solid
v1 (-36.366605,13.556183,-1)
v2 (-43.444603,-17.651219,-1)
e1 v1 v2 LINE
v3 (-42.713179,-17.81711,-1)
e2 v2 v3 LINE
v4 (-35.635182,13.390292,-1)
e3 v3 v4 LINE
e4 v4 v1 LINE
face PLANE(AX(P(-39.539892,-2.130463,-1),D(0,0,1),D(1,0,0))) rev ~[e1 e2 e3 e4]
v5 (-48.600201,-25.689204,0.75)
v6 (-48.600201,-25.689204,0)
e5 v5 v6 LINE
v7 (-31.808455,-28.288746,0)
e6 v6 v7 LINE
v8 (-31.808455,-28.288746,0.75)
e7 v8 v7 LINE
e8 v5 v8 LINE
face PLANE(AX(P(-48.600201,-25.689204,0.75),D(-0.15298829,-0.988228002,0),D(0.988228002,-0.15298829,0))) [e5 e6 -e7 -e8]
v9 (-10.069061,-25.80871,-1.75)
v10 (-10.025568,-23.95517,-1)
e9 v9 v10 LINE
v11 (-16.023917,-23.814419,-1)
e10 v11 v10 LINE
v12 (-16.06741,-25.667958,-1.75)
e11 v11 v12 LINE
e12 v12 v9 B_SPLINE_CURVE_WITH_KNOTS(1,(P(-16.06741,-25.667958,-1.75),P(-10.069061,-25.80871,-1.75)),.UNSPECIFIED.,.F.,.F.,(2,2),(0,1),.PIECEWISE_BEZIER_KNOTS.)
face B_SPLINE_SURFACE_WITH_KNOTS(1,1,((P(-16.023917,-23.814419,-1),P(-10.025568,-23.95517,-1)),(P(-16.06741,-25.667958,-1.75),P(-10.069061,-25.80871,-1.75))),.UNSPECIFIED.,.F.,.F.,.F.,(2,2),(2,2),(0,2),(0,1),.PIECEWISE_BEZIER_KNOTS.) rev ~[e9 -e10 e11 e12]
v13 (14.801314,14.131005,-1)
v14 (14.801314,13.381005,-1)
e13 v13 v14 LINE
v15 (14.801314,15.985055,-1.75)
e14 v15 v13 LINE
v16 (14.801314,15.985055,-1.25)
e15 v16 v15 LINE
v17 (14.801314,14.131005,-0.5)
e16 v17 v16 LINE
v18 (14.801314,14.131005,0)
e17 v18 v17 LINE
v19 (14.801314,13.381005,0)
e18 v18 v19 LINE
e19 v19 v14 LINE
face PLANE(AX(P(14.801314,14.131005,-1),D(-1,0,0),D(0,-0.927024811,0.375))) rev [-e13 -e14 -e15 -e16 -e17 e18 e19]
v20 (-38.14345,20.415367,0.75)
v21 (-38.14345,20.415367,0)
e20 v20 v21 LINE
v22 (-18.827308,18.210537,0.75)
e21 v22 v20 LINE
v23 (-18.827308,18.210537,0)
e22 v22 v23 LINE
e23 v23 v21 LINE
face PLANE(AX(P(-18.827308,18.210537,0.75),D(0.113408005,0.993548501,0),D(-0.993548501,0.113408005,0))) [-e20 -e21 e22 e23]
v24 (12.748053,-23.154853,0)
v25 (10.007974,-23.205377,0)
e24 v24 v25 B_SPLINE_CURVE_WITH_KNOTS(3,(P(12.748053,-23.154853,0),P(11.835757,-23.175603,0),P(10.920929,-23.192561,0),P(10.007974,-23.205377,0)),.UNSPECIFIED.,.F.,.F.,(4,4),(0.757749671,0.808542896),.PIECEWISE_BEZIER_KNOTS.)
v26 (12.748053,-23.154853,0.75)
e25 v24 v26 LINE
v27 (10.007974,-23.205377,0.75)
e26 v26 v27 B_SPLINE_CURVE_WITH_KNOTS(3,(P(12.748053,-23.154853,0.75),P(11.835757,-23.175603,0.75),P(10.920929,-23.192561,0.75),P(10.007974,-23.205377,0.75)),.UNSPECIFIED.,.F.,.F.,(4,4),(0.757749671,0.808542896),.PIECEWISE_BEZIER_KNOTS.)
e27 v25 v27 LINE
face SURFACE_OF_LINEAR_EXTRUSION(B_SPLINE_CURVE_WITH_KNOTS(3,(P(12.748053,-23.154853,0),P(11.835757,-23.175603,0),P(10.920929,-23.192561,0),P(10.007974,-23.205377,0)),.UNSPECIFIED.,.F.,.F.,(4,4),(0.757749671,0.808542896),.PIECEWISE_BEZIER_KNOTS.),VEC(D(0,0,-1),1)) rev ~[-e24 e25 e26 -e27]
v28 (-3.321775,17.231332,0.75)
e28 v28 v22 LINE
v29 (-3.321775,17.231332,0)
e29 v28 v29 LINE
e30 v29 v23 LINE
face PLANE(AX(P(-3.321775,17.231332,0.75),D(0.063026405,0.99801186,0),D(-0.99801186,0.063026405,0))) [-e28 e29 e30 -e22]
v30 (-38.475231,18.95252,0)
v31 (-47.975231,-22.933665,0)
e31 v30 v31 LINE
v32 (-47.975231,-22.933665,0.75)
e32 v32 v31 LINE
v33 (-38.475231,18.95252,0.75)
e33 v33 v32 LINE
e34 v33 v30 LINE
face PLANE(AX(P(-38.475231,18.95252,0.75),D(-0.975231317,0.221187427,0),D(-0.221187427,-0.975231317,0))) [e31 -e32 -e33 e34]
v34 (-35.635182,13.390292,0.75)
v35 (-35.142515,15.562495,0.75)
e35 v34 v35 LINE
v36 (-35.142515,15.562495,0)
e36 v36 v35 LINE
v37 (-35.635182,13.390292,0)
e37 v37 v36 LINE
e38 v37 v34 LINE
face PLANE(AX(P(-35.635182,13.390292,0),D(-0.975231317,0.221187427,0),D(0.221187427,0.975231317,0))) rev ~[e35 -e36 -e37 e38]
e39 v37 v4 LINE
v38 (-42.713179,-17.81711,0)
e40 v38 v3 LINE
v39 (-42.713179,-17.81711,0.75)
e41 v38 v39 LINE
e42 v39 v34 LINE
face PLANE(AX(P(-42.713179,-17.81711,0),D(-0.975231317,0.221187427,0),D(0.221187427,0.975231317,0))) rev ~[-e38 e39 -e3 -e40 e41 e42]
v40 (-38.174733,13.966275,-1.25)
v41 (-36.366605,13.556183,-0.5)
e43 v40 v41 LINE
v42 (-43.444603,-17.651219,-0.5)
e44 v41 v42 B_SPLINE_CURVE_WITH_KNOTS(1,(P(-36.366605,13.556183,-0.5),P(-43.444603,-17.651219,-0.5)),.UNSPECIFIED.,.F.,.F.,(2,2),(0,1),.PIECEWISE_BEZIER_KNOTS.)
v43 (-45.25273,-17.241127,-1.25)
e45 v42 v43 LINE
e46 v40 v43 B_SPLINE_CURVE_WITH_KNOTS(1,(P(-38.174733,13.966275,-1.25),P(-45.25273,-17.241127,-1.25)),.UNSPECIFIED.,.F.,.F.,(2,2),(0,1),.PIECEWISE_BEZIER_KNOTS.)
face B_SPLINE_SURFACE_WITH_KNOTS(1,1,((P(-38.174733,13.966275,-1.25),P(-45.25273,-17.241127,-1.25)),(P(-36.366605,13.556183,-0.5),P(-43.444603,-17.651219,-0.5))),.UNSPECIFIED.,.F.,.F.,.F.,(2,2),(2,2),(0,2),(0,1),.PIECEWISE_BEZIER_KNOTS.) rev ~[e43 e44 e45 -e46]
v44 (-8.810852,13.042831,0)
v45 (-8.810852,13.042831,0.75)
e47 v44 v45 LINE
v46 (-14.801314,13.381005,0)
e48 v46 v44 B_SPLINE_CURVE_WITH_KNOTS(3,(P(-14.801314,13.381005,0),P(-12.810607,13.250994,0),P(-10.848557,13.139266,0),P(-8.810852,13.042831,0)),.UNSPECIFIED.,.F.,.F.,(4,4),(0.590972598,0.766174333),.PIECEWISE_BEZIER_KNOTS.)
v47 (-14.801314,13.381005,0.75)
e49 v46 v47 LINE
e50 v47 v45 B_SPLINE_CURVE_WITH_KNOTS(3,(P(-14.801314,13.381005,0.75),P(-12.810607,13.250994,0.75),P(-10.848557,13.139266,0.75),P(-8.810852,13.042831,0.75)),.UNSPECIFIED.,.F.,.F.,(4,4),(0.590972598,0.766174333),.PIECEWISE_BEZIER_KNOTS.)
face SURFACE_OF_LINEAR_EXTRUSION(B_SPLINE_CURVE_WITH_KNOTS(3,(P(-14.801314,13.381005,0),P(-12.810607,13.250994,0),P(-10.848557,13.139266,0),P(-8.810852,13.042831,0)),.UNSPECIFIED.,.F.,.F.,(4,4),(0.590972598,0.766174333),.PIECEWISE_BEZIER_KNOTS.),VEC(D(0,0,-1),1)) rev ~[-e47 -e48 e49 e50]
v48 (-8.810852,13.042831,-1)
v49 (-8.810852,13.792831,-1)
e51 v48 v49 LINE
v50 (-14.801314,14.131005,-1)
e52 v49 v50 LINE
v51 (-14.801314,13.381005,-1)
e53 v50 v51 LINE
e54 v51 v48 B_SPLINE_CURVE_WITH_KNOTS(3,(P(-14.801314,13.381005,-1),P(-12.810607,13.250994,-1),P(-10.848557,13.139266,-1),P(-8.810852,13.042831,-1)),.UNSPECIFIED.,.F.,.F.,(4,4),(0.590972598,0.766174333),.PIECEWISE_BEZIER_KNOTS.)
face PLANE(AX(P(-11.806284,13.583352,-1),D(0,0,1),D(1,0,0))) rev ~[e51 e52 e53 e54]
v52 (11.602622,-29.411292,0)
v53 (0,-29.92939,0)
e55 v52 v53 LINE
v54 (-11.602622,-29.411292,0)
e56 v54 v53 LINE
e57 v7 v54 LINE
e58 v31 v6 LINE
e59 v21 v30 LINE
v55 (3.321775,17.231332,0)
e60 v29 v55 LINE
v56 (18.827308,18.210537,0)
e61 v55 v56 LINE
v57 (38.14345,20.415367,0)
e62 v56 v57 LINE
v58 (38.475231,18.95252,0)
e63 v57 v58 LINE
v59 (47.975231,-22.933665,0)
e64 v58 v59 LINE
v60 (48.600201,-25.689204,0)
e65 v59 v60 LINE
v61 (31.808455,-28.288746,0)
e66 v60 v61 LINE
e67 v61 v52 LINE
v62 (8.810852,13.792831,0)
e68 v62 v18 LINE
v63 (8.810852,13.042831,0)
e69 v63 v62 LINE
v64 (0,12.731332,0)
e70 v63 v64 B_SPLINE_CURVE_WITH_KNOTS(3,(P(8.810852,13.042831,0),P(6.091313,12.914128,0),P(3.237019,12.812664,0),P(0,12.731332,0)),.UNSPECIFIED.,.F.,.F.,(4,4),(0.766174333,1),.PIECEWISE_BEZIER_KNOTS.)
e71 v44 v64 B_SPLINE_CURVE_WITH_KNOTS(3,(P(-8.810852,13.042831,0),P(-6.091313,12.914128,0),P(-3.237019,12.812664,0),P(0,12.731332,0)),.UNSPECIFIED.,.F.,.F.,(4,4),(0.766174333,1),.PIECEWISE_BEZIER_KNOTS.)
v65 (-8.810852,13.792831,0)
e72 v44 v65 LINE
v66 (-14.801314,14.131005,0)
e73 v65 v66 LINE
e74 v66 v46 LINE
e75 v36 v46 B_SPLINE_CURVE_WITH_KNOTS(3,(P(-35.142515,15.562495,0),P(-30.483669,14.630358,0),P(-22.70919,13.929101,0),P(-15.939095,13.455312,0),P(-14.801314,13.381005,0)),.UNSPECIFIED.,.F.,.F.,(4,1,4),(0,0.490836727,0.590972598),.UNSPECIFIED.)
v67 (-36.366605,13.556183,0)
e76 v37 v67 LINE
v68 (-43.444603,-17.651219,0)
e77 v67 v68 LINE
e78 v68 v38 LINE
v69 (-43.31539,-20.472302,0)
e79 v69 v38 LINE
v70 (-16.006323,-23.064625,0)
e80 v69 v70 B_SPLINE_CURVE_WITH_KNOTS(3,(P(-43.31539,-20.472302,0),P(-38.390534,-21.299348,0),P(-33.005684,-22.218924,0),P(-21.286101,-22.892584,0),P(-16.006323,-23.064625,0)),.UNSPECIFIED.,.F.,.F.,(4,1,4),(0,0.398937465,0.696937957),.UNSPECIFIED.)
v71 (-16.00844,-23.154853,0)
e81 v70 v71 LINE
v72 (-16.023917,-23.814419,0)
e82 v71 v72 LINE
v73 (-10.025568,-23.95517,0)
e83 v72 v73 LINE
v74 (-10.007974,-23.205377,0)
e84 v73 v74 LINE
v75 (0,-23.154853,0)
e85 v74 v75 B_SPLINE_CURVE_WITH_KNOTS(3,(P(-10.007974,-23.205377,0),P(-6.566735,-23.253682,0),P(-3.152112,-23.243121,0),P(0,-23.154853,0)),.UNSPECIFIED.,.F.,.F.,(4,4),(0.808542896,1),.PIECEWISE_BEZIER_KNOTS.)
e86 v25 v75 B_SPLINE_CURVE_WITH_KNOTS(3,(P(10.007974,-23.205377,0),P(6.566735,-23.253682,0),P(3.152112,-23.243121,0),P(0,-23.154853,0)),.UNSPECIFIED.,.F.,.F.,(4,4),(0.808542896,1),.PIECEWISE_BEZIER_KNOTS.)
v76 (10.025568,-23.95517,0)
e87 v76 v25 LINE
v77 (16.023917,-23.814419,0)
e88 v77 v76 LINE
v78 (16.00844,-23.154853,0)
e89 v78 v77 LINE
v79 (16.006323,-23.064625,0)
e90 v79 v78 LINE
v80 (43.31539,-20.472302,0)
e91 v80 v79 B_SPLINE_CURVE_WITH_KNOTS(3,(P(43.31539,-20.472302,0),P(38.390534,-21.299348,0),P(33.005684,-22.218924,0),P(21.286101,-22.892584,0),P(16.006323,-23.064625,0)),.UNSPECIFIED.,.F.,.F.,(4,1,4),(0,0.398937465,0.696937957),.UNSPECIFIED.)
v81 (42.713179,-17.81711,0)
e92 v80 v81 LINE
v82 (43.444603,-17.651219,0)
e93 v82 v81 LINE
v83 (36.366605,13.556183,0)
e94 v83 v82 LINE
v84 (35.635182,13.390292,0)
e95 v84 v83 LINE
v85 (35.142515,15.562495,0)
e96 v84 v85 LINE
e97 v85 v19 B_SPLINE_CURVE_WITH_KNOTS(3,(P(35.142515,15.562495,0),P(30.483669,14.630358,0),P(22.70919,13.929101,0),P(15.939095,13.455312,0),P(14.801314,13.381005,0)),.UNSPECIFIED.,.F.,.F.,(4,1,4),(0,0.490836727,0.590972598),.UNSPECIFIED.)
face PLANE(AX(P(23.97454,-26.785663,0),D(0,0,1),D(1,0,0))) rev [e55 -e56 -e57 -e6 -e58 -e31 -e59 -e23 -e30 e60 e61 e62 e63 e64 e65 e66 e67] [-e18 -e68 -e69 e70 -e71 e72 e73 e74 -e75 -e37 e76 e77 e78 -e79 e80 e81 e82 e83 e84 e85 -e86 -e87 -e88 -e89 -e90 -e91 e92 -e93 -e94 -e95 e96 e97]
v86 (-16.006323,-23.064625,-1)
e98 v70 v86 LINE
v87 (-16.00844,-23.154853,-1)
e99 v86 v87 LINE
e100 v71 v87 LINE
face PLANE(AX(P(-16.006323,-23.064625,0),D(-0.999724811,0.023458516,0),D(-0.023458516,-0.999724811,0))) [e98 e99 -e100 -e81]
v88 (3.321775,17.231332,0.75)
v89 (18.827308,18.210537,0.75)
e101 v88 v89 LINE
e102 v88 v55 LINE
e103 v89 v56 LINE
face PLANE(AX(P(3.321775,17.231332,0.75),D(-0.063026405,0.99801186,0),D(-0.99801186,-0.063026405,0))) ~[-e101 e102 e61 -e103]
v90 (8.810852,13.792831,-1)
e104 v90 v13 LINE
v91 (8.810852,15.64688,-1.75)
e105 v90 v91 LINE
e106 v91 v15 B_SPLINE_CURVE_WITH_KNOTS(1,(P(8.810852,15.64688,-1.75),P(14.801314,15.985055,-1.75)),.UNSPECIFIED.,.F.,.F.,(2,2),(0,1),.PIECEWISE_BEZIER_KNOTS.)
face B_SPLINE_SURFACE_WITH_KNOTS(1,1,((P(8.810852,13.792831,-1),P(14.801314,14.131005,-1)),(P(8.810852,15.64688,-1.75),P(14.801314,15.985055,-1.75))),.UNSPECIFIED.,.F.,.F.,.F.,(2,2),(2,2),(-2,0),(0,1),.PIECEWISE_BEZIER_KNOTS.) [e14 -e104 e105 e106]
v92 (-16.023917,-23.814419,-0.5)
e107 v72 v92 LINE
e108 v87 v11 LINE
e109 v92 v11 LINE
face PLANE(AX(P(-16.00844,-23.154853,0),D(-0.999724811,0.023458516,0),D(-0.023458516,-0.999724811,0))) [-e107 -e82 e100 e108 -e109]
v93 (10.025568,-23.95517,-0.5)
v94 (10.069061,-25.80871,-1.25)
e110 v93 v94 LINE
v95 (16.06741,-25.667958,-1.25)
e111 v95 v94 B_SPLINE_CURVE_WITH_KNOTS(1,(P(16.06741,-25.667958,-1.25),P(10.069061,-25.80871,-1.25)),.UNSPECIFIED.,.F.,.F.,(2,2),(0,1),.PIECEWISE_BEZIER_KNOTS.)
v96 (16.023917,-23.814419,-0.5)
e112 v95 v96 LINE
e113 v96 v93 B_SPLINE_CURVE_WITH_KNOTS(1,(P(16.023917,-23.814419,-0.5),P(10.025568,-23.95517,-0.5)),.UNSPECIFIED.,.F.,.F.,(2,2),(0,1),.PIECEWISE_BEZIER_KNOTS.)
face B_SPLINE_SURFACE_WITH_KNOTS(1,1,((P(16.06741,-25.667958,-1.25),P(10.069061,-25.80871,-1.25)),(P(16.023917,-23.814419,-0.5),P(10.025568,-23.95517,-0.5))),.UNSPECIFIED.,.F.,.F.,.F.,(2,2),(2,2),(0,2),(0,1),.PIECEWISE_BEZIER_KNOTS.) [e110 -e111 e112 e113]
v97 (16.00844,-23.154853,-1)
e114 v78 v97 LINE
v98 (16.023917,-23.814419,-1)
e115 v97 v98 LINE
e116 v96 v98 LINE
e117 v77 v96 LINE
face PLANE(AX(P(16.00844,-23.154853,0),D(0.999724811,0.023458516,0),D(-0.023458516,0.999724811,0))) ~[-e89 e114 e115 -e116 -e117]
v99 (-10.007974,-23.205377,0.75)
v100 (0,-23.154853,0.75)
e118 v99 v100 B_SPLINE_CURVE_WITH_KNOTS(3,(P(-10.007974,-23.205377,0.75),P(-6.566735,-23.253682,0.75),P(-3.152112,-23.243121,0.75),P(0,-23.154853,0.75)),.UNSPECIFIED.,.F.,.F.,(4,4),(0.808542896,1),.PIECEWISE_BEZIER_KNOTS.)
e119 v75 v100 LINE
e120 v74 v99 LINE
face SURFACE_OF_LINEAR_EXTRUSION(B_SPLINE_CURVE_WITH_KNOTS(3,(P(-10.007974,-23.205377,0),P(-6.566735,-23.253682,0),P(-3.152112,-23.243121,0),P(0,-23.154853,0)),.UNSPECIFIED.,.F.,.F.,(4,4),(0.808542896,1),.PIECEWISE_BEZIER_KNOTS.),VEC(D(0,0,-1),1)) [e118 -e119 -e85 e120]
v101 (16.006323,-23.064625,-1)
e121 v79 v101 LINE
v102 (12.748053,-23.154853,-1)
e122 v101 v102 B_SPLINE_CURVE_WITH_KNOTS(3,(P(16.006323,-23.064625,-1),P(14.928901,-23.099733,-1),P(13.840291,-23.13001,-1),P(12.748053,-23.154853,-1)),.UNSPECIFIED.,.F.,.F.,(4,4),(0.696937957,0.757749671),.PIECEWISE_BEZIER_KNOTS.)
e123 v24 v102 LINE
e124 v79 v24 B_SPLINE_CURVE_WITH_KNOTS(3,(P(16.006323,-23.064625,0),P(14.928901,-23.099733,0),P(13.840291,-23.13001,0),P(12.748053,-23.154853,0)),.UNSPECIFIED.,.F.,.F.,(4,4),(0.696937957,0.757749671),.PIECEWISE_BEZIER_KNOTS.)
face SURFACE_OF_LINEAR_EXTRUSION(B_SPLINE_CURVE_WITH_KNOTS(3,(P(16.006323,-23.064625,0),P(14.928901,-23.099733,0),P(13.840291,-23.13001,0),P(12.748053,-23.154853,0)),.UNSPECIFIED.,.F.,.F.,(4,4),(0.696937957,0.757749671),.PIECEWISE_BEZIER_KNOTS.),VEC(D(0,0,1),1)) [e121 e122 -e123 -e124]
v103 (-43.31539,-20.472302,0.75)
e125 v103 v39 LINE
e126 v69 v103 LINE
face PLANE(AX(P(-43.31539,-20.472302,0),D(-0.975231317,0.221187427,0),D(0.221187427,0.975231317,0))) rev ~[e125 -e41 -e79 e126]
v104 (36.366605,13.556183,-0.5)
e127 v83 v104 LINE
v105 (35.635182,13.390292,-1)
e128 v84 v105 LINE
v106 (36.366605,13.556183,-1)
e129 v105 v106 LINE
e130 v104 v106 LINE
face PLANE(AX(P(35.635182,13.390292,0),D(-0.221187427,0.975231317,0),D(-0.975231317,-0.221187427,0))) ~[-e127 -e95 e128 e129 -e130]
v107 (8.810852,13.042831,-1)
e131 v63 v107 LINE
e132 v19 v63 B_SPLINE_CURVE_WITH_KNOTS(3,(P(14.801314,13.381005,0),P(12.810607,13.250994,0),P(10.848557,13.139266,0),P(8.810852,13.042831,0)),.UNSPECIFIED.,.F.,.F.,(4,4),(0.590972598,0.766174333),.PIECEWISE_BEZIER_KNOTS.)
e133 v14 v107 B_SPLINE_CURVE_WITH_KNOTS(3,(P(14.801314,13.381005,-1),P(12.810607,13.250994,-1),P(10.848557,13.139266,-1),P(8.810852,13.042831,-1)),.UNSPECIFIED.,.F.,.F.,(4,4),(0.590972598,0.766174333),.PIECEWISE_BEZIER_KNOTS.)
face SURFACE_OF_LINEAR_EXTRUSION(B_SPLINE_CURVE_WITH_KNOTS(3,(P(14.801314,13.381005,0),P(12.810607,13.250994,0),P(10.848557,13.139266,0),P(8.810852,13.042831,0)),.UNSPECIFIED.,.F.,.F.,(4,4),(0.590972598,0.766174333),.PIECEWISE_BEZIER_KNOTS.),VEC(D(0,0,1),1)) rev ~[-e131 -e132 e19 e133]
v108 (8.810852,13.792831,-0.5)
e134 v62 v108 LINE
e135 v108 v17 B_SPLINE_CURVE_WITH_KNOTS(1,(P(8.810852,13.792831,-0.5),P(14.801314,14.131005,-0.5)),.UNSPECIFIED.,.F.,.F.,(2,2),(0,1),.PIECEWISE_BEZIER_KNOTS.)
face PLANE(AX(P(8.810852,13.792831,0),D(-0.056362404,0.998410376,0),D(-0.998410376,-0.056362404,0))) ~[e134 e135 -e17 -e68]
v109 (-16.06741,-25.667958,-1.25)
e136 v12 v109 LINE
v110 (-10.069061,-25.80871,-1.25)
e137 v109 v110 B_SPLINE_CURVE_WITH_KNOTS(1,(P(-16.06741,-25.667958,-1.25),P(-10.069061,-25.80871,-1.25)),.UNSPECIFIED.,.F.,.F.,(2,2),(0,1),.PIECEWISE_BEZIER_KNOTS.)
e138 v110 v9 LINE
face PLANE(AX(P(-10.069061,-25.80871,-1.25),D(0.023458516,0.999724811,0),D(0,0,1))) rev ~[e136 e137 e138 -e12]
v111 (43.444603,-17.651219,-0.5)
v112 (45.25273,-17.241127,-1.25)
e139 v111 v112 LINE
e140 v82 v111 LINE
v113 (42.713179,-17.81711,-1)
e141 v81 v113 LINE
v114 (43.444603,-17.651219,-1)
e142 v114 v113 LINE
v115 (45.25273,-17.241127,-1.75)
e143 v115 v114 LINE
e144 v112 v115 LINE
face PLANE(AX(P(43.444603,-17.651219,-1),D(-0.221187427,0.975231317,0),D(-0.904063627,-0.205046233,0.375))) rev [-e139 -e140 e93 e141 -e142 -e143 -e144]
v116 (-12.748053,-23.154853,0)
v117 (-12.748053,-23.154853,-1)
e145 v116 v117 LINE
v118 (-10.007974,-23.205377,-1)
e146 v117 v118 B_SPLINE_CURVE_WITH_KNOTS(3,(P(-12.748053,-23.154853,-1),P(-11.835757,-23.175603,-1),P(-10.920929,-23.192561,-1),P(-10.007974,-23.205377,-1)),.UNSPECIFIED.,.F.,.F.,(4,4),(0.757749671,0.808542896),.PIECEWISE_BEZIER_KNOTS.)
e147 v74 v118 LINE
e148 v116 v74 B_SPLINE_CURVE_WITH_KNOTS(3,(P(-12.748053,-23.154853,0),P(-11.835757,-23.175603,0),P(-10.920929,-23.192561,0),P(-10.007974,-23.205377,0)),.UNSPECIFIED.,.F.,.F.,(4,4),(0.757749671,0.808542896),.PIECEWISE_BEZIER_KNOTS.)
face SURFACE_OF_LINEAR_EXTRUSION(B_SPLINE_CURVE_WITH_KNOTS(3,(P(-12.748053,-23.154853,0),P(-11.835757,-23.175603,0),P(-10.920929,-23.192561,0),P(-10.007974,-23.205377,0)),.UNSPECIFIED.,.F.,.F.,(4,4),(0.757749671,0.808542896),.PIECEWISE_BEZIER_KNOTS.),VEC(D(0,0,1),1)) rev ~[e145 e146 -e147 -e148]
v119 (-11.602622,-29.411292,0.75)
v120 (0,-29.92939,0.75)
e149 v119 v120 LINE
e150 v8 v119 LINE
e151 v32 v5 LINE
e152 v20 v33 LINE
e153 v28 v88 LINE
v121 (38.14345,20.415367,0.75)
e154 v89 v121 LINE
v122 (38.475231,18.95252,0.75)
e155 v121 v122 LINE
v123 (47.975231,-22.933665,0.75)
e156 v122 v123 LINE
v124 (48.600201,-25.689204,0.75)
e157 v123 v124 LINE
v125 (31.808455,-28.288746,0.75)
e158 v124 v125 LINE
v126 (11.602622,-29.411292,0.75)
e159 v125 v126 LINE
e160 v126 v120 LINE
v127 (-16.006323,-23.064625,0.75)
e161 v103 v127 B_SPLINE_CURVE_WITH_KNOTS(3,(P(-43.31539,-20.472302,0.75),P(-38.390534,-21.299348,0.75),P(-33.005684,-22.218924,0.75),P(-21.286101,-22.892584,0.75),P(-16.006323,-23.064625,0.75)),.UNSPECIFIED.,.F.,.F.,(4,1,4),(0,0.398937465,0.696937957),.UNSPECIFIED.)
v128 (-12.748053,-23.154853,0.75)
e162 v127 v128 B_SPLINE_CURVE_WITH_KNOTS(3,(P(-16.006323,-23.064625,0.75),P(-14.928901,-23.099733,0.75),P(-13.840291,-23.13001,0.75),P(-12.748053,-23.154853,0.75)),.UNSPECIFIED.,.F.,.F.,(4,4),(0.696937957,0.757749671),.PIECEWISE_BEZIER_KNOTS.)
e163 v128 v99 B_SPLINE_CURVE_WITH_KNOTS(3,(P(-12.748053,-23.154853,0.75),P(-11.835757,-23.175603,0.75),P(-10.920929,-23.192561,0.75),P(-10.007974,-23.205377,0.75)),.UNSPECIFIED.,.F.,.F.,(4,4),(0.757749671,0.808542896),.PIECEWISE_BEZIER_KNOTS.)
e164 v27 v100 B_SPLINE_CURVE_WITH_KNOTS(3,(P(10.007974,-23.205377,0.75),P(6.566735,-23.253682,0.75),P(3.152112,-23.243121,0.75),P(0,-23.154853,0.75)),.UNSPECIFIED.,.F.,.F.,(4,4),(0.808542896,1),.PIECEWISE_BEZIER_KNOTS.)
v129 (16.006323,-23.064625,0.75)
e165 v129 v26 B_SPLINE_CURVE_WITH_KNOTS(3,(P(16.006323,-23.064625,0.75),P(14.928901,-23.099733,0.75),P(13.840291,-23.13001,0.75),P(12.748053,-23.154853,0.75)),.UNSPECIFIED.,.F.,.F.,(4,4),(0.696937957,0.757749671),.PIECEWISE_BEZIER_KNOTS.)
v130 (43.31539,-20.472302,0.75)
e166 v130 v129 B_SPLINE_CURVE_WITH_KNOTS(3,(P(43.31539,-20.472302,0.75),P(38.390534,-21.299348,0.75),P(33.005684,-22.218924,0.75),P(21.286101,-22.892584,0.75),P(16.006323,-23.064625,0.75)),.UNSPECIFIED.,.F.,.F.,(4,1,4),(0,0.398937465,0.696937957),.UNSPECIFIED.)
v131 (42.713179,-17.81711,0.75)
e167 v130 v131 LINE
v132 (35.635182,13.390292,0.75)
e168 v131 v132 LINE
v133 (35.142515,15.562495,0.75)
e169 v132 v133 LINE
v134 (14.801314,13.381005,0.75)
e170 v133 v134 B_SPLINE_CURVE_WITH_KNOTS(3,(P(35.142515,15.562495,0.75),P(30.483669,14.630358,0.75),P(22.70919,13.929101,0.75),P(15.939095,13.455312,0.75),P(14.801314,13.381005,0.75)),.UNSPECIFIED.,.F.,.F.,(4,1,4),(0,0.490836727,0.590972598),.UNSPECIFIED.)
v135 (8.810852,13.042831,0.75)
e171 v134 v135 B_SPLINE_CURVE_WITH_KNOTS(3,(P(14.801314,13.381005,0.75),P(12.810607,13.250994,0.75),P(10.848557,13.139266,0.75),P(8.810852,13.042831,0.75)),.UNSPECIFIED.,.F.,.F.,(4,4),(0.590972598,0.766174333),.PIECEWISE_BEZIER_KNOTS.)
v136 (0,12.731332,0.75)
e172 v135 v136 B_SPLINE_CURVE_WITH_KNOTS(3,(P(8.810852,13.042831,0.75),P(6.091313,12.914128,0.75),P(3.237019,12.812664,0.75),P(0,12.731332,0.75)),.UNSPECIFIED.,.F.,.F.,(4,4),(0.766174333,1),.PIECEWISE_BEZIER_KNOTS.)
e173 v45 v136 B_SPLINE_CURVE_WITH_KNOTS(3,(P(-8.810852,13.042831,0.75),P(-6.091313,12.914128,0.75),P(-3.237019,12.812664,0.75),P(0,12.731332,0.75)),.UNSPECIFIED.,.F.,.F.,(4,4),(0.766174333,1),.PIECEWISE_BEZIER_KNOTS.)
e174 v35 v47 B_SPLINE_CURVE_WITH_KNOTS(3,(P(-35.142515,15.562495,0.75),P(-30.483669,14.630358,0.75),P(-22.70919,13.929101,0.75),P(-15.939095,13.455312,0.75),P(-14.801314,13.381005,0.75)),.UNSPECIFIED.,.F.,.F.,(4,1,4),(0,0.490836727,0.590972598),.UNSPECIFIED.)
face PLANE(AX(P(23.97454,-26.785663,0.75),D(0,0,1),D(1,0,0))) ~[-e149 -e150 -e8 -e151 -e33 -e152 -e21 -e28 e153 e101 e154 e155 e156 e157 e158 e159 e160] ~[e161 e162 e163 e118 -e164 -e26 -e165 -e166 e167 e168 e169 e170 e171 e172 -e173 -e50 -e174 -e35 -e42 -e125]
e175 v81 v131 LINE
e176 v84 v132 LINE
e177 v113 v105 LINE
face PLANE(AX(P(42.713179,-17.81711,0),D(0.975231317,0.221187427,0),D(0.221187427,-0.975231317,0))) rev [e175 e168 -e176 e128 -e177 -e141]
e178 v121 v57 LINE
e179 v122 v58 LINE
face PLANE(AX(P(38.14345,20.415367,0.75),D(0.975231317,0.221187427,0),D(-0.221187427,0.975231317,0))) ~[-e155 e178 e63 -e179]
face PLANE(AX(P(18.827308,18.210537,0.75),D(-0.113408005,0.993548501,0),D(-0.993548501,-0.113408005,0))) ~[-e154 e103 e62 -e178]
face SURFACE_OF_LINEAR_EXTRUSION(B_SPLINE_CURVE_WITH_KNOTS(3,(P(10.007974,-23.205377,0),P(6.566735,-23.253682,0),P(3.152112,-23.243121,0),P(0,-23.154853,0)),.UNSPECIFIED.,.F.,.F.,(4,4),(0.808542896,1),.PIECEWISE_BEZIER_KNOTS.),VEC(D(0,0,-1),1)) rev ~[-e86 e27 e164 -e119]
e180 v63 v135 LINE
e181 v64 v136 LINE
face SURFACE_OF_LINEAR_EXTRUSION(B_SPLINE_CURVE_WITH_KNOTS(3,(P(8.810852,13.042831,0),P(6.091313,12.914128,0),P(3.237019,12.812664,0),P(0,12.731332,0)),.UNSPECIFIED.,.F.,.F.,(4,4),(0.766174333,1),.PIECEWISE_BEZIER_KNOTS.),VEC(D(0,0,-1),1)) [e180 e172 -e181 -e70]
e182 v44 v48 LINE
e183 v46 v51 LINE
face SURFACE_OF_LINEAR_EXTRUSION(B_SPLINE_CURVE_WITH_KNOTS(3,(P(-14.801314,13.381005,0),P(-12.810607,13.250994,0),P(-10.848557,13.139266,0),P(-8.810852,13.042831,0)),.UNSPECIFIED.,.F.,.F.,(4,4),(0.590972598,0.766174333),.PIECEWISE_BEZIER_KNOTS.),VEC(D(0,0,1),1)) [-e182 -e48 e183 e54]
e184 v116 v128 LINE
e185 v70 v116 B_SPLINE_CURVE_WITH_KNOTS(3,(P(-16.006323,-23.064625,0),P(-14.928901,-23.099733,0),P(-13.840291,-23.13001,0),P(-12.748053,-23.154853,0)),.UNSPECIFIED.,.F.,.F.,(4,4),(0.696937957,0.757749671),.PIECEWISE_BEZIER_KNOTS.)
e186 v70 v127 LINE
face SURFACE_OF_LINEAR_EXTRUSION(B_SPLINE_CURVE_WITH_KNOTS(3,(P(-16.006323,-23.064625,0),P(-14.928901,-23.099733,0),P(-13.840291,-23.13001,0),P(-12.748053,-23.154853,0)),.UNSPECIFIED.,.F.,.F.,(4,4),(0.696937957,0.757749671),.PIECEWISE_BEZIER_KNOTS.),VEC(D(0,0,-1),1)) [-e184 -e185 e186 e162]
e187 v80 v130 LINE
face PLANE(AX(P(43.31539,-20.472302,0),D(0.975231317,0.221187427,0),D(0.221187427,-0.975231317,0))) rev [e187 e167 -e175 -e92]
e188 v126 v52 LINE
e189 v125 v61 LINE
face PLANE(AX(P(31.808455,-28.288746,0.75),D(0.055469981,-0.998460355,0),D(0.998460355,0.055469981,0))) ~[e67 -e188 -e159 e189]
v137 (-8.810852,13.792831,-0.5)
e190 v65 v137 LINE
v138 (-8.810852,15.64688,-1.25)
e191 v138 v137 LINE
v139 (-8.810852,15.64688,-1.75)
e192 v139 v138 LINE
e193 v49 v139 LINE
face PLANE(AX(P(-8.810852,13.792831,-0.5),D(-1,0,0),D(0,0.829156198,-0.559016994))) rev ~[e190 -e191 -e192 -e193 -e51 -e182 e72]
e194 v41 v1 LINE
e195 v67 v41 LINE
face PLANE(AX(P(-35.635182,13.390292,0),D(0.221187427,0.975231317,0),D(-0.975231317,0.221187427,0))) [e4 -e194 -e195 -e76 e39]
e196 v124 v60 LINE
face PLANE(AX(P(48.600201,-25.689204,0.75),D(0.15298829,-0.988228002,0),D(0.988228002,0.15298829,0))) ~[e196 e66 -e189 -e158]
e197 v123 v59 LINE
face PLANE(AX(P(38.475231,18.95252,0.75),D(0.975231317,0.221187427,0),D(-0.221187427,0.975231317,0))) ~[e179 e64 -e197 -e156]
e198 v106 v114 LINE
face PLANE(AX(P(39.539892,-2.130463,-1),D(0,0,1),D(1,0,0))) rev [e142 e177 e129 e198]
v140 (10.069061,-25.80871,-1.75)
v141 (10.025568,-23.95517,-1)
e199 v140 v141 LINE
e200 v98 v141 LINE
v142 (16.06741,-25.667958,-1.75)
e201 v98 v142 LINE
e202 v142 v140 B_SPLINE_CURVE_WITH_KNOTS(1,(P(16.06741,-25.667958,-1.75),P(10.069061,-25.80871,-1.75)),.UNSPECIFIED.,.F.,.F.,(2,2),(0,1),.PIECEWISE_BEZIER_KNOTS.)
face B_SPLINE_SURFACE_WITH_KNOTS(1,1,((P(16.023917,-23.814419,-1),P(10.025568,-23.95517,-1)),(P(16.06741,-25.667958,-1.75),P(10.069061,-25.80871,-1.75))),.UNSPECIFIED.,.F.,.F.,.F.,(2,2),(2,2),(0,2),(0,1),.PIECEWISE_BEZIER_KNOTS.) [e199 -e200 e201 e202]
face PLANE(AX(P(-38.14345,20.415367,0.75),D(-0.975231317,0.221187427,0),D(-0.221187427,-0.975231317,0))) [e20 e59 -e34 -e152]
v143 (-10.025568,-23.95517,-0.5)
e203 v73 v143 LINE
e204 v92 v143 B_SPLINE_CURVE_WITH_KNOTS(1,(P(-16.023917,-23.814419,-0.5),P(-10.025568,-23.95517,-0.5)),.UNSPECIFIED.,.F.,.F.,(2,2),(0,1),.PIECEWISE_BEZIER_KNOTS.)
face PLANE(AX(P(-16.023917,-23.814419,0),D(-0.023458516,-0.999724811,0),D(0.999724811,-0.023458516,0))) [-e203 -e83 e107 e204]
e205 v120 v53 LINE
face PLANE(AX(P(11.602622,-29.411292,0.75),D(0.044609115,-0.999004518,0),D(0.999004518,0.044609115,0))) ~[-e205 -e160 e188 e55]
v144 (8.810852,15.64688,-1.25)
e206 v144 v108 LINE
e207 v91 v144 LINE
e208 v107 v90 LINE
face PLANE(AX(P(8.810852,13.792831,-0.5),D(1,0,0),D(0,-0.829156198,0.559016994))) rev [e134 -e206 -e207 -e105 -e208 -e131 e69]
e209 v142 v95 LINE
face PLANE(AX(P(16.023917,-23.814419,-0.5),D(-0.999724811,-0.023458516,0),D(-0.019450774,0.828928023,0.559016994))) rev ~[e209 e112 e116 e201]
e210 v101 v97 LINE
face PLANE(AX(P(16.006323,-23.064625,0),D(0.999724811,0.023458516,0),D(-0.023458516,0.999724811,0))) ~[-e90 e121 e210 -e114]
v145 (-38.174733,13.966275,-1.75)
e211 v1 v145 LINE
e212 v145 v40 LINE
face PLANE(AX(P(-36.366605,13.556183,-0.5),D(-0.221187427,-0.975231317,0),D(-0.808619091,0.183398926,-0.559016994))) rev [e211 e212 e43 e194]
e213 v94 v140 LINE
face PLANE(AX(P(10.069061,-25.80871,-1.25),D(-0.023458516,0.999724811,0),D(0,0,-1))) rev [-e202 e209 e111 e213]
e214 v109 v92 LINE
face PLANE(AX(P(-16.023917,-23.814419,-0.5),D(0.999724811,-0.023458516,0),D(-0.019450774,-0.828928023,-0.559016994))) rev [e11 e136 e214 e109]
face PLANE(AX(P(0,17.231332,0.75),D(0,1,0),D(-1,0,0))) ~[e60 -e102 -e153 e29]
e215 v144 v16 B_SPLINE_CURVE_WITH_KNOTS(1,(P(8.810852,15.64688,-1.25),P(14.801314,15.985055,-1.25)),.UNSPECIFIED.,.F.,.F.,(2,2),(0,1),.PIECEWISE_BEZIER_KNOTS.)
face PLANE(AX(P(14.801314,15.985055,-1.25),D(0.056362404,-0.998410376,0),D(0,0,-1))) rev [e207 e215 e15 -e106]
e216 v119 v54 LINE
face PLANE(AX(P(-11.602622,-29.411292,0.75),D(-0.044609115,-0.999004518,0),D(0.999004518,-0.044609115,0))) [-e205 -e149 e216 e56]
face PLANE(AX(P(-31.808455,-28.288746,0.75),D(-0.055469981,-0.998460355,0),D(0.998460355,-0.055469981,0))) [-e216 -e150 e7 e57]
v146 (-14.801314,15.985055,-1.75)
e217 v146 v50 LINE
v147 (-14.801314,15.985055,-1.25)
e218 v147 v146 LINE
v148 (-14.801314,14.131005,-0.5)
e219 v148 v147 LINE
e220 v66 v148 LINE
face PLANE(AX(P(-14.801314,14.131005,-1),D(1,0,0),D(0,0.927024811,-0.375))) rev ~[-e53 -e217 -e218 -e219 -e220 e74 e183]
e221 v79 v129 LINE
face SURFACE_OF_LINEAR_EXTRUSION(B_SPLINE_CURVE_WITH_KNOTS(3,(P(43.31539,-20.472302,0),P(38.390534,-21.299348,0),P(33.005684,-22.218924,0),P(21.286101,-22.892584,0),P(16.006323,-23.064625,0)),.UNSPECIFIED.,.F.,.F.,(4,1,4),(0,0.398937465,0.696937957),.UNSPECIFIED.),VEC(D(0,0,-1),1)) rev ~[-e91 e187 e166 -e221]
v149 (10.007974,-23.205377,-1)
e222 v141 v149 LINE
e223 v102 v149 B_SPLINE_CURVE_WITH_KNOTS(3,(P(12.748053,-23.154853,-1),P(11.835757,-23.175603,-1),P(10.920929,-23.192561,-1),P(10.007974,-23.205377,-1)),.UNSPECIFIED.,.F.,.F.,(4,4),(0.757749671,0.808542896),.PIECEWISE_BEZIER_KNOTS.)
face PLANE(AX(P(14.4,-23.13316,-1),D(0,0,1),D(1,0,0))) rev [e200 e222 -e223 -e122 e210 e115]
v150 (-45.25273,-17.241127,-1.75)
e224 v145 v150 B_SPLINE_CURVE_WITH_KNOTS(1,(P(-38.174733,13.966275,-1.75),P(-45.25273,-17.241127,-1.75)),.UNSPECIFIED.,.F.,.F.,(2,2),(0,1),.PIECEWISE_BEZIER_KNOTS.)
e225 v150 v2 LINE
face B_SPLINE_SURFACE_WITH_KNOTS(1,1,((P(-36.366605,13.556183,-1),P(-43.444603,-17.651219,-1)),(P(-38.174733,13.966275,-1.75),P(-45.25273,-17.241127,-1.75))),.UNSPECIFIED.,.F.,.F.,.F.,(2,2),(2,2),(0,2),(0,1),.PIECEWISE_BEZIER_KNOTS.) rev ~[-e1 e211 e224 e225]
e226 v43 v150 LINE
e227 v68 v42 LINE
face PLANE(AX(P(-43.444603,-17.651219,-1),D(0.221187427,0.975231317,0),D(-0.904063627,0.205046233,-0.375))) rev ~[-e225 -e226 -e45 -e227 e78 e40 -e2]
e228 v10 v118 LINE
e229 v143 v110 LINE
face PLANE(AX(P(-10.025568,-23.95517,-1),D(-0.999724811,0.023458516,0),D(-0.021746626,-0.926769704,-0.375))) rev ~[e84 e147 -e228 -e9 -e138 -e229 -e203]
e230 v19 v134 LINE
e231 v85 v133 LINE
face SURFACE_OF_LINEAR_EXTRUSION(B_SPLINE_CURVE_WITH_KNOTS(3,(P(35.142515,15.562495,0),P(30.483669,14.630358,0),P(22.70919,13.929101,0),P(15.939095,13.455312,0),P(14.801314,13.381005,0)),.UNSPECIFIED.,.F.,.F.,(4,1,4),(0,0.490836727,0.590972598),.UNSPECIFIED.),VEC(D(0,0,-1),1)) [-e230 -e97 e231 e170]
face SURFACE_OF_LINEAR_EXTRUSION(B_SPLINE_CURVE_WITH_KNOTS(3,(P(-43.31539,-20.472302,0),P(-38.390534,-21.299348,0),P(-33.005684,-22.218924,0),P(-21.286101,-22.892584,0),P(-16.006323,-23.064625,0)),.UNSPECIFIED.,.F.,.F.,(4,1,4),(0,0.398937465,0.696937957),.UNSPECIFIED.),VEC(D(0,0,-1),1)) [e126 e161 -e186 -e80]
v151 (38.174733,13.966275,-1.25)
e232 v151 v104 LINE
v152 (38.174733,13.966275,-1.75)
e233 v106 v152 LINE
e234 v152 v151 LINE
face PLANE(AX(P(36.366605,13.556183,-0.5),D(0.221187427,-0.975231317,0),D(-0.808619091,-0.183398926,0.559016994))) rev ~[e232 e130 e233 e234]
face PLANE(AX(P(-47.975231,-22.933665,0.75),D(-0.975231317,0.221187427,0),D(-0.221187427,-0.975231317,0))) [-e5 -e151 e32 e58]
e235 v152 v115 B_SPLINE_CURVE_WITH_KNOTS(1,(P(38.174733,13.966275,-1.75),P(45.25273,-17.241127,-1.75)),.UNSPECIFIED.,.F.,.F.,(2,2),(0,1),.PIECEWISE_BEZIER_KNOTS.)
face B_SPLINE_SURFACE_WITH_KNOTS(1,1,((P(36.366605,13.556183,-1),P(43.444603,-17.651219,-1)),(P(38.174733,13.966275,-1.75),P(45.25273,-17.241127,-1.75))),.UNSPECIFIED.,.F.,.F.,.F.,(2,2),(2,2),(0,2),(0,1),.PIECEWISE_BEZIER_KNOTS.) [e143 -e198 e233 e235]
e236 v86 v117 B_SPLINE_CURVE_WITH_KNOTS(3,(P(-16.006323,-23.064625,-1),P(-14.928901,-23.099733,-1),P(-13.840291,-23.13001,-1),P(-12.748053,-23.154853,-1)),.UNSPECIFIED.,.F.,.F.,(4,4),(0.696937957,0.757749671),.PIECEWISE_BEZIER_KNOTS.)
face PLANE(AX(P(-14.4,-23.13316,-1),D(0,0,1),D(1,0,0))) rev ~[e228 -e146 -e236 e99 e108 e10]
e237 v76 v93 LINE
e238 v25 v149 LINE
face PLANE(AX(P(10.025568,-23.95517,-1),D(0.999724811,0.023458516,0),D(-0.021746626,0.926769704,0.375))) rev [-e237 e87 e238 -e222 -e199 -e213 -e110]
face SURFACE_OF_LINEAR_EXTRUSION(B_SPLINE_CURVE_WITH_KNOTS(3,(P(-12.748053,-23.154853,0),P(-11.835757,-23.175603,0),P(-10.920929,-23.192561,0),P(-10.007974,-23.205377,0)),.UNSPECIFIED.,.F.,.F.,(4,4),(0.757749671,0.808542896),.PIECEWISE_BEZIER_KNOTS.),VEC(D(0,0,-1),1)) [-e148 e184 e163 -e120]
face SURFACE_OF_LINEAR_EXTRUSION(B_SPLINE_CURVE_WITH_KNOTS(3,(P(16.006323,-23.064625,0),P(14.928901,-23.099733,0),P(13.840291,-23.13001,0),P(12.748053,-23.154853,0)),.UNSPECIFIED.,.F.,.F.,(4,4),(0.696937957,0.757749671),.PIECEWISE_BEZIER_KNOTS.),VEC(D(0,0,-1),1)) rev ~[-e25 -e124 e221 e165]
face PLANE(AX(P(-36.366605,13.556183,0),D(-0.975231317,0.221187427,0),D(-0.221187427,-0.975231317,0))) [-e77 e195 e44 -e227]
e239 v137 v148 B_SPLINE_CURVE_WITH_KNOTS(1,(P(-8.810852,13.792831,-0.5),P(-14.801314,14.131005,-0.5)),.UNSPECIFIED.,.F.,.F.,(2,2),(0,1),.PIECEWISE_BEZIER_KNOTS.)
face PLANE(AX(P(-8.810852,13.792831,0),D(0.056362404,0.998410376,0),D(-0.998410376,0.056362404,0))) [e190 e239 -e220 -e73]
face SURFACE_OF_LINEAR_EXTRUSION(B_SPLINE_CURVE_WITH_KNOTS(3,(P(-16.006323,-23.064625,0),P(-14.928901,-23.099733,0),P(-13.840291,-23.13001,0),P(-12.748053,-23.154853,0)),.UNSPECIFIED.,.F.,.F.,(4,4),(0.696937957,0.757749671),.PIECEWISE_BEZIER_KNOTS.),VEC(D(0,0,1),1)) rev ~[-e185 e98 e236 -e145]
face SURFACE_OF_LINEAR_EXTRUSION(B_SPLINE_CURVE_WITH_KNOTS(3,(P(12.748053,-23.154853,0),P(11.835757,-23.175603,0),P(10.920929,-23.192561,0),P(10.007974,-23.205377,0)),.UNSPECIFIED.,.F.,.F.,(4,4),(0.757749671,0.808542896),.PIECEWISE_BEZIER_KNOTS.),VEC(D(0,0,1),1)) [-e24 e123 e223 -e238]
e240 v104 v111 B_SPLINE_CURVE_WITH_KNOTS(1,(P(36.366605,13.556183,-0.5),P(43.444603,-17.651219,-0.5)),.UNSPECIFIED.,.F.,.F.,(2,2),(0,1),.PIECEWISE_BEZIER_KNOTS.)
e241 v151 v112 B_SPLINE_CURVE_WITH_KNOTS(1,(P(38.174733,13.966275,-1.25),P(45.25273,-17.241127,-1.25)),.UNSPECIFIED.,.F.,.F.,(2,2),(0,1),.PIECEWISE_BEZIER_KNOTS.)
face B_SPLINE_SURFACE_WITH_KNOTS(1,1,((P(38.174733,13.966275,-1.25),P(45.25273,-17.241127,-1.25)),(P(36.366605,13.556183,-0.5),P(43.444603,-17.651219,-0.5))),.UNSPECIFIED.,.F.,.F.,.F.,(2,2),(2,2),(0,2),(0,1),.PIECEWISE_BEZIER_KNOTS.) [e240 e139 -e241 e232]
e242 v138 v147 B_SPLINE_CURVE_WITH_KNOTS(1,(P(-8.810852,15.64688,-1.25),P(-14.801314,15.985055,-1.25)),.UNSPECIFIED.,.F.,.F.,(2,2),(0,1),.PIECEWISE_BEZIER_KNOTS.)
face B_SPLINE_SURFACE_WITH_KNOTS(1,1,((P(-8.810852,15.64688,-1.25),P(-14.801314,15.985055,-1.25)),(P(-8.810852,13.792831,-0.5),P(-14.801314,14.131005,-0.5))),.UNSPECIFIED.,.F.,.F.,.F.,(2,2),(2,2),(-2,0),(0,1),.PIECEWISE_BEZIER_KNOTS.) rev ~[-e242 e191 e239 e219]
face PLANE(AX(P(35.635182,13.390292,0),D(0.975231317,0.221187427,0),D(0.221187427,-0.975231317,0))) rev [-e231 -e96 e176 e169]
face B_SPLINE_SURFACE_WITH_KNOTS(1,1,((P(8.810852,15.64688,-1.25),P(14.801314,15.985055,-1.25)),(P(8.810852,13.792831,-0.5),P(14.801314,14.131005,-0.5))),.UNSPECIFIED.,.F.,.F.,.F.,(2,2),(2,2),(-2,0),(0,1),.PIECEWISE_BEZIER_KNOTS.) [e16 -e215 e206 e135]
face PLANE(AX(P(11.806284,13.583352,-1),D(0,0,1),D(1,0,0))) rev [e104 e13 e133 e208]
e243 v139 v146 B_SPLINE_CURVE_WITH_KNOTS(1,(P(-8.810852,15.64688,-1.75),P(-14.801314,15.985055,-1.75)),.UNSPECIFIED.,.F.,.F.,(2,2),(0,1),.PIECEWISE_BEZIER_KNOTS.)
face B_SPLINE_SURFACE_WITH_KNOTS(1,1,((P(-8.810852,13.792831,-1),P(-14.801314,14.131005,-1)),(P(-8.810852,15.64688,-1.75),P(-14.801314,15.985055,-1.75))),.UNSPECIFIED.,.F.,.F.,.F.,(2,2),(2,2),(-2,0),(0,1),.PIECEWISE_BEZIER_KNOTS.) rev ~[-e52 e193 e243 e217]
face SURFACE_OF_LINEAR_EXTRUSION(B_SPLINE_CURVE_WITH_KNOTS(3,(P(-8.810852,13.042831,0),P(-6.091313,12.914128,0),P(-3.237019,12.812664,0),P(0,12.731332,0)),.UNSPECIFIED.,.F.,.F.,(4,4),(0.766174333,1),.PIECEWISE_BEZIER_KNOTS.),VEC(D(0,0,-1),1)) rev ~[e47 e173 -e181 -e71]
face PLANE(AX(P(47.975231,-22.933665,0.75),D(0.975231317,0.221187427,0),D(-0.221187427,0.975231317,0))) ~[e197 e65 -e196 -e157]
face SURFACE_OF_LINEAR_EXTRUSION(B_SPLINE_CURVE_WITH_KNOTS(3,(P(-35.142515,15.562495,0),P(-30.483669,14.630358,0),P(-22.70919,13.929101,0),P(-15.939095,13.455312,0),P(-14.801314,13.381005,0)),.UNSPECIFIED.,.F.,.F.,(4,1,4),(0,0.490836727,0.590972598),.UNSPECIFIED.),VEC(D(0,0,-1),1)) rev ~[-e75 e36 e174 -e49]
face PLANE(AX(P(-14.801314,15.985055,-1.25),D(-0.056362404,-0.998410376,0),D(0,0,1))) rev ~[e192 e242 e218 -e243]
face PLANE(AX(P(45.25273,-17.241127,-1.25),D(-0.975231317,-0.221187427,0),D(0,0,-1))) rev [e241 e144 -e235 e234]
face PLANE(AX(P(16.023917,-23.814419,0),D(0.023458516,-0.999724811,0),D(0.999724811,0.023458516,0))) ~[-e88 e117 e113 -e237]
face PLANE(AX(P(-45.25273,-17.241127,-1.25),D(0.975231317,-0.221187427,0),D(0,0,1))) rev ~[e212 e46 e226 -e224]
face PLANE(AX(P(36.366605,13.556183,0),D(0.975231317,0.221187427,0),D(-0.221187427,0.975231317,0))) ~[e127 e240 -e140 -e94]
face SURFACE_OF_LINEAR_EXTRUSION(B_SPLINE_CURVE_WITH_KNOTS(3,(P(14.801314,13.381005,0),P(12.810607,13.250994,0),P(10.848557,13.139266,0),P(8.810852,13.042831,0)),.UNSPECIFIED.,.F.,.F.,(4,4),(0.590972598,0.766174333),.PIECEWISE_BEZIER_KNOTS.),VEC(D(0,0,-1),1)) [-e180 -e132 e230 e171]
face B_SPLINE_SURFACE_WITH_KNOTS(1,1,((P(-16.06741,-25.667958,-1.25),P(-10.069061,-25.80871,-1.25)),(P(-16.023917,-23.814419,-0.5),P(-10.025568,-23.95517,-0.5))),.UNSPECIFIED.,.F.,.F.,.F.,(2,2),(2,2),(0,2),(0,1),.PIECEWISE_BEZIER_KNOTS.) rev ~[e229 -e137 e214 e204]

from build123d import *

# Parameters (mm, degrees)
F1_DEPTH = 0.75
F2_DEPTH = 1
F4_DEPTH = 0.75
F6_DEPTH = 0.75
F8_DEPTH = 0.75


with BuildPart() as f1:
    # F0 (on Top) → F1 (new body)
    with BuildSketch(Plane.XY):
        with BuildLine():
            add(Edge.make_bspline(
                [(-37.5, 18.7313321615), (-32.3807911431, 17.926577975), (-18.7011737223, 16.5680764405), (-7.3513992733, 15.9357535011), (0, 15.7313321615)],
                knots=[0, 0, 0, 0, 0.4901565124, 1, 1, 1, 1], degree=3))
            Line((-37.5, 18.7313321615), (-47, -23.1548529118))
            Line((-47, -23.1548529118), (-16.0084403101, -23.1548529118))
            Line((-16.0084403101, -23.1548529118), (-16.0063231241, -23.0646254072))
            add(Edge.make_bspline(
                [(-43.315390494, -20.4723017862), (-38.3905339247, -21.2993483436), (-33.0056838871, -22.2189238519), (-21.2861009313, -22.8925835376), (-16.0063231241, -23.0646254072)],
                knots=[0, 0, 0, 0, 0.398937465, 0.6969379575, 0.6969379575, 0.6969379575, 0.6969379575], degree=3))
            Line((-43.315390494, -20.4723017862), (-42.7131794367, -17.8171098074))
            Line((-42.7131794367, -17.8171098074), (-43.4446029246, -17.651219237))
            Line((-43.4446029246, -17.651219237), (-36.3666052528, 13.5561829132))
            Line((-36.3666052528, 13.5561829132), (-35.635181765, 13.3902923427))
            Line((-35.635181765, 13.3902923427), (-35.1425150574, 15.562495384))
            add(Edge.make_bspline(
                [(-35.1425150574, 15.562495384), (-30.4836686701, 14.6303577349), (-22.7091897663, 13.9291012054), (-15.9390947662, 13.4553124867), (-14.8013141006, 13.3810050341)],
                knots=[0, 0, 0, 0, 0.4908367268, 0.5909725979, 0.5909725979, 0.5909725979, 0.5909725979], degree=3))
            Line((-14.8013141006, 13.3810050341), (-14.8013141006, 14.1310050341))
            Line((-14.8013141006, 14.1310050341), (-8.8108518429, 13.792830613))
            Line((-8.8108518429, 13.792830613), (-8.8108518429, 13.042830613))
            add(Edge.make_bspline(
                [(-8.8108518429, 13.042830613), (-6.0913133604, 12.9141276056), (-3.2370188614, 12.8126642043), (0, 12.7313321615)],
                knots=[0.7661743328, 0.7661743328, 0.7661743328, 0.7661743328, 1, 1, 1, 1], degree=3))
            Line((0, 12.7313321615), (0, 15.7313321615))
        make_face()
        with BuildLine():
            Line((-16.0084403101, -23.1548529118), (-47, -23.1548529118))
            add(Edge.make_bspline(
                [(-47, -23.1548529118), (-39.471310208, -24.0545421828), (-29.2503257197, -25.7571688291), (-8.0323131497, -26.1634826516), (0, -26.1548529118)],
                knots=[0, 0, 0, 0, 0.4528935937, 1, 1, 1, 1], degree=3))
            Line((0, -26.1548529118), (0, -23.1548529118))
            add(Edge.make_bspline(
                [(-10.0079742572, -23.2053765011), (-6.5667353079, -23.2536816802), (-3.1521121944, -23.2431206783), (0, -23.1548529118)],
                knots=[0.8085428965, 0.8085428965, 0.8085428965, 0.8085428965, 1, 1, 1, 1], degree=3))
            Line((-10.0079742572, -23.2053765011), (-10.0255681439, -23.9551701095))
            Line((-10.0255681439, -23.9551701095), (-16.0239170108, -23.8144190156))
            Line((-16.0239170108, -23.8144190156), (-16.0084403101, -23.1548529118))
        make_face()
        with BuildLine():
            Line((-16.0063231241, -23.0646254072), (-16.0084403101, -23.1548529118))
            Line((-16.0084403101, -23.1548529118), (-12.748052928, -23.1548529118))
            add(Edge.make_bspline(
                [(-16.0063231241, -23.0646254072), (-14.9289009553, -23.0997332718), (-13.8402912127, -23.1300103495), (-12.748052928, -23.1548529118)],
                knots=[0.6969379575, 0.6969379575, 0.6969379575, 0.6969379575, 0.7577496714, 0.7577496714, 0.7577496714, 0.7577496714], degree=3))
        make_face()
        with BuildLine():
            Line((-12.748052928, -23.1548529118), (-16.0084403101, -23.1548529118))
            Line((-16.0084403101, -23.1548529118), (-16.0239170108, -23.8144190156))
            Line((-16.0239170108, -23.8144190156), (-10.0255681439, -23.9551701095))
            Line((-10.0255681439, -23.9551701095), (-10.0079742572, -23.2053765011))
            add(Edge.make_bspline(
                [(-12.748052928, -23.1548529118), (-11.8357565687, -23.1756027605), (-10.9209287599, -23.192561224), (-10.0079742572, -23.2053765011)],
                knots=[0.7577496714, 0.7577496714, 0.7577496714, 0.7577496714, 0.8085428965, 0.8085428965, 0.8085428965, 0.8085428965], degree=3))
        make_face()
        with BuildLine():
            add(Edge.make_bspline(
                [(-14.8013141006, 13.3810050341), (-12.8106074305, 13.2509937357), (-10.8485573953, 13.1392656642), (-8.8108518429, 13.042830613)],
                knots=[0.5909725979, 0.5909725979, 0.5909725979, 0.5909725979, 0.7661743328, 0.7661743328, 0.7661743328, 0.7661743328], degree=3))
            Line((-8.8108518429, 13.042830613), (-8.8108518429, 13.792830613))
            Line((-8.8108518429, 13.792830613), (-14.8013141006, 14.1310050341))
            Line((-14.8013141006, 14.1310050341), (-14.8013141006, 13.3810050341))
        make_face()
        Polygon((-43.4446029246, -17.651219237), (-42.7131794367, -17.8171098074), (-35.635181765, 13.3902923427), (-36.3666052528, 13.5561829132), align=None)
    extrude(amount=F1_DEPTH)

    # F0 (on Top) → F2 (join)
    with BuildSketch(Plane.XY):
        with BuildLine():
            Line((-16.0063231241, -23.0646254072), (-16.0084403101, -23.1548529118))
            Line((-16.0084403101, -23.1548529118), (-12.748052928, -23.1548529118))
            add(Edge.make_bspline(
                [(-16.0063231241, -23.0646254072), (-14.9289009553, -23.0997332718), (-13.8402912127, -23.1300103495), (-12.748052928, -23.1548529118)],
                knots=[0.6969379575, 0.6969379575, 0.6969379575, 0.6969379575, 0.7577496714, 0.7577496714, 0.7577496714, 0.7577496714], degree=3))
        make_face()
        with BuildLine():
            Line((-12.748052928, -23.1548529118), (-16.0084403101, -23.1548529118))
            Line((-16.0084403101, -23.1548529118), (-16.0239170108, -23.8144190156))
            Line((-16.0239170108, -23.8144190156), (-10.0255681439, -23.9551701095))
            Line((-10.0255681439, -23.9551701095), (-10.0079742572, -23.2053765011))
            add(Edge.make_bspline(
                [(-12.748052928, -23.1548529118), (-11.8357565687, -23.1756027605), (-10.9209287599, -23.192561224), (-10.0079742572, -23.2053765011)],
                knots=[0.7577496714, 0.7577496714, 0.7577496714, 0.7577496714, 0.8085428965, 0.8085428965, 0.8085428965, 0.8085428965], degree=3))
        make_face()
        with BuildLine():
            add(Edge.make_bspline(
                [(-14.8013141006, 13.3810050341), (-12.8106074305, 13.2509937357), (-10.8485573953, 13.1392656642), (-8.8108518429, 13.042830613)],
                knots=[0.5909725979, 0.5909725979, 0.5909725979, 0.5909725979, 0.7661743328, 0.7661743328, 0.7661743328, 0.7661743328], degree=3))
            Line((-8.8108518429, 13.042830613), (-8.8108518429, 13.792830613))
            Line((-8.8108518429, 13.792830613), (-14.8013141006, 14.1310050341))
            Line((-14.8013141006, 14.1310050341), (-14.8013141006, 13.3810050341))
        make_face()
        Polygon((-43.4446029246, -17.651219237), (-42.7131794367, -17.8171098074), (-35.635181765, 13.3902923427), (-36.3666052528, 13.5561829132), align=None)
    extrude(amount=-F2_DEPTH)

    # F3 (on face) → F4 (join, through all)
    with BuildSketch(Plane.XY.offset(0.75)):
        Polygon((-47.9752313172, -22.9336654846), (-47, -23.1548529118), (-37.5, 18.7313321615), (-38.4752313172, 18.9525195888), align=None)
    extrude(amount=-F4_DEPTH)

    # F5 (on face) → F6 (join, through all)
    with BuildSketch(Plane.XY.offset(0.75)):
        with BuildLine():
            Line((-38.1434501763, 20.4153665646), (-38.4752313172, 18.9525195888))
            Line((-38.4752313172, 18.9525195888), (-37.5, 18.7313321615))
            add(Edge.make_bspline(
                [(-37.5, 18.7313321615), (-32.3807911431, 17.926577975), (-18.7011737223, 16.5680764405), (-7.3513992733, 15.9357535011), (0, 15.7313321615)],
                knots=[0, 0, 0, 0, 0.4901565124, 1, 1, 1, 1], degree=3))
            Line((0, 15.7313321615), (0, 17.2313321615))
            Line((0, 17.2313321615), (-3.3217752352, 17.2313321615))
            Line((-3.3217752352, 17.2313321615), (-18.8273077893, 18.2105369309))
            Line((-18.8273077893, 18.2105369309), (-38.1434501763, 20.4153665646))
        make_face()
    extrude(amount=-F6_DEPTH)

    # F7 (on face) → F8 (join, through all)
    with BuildSketch(Plane.XY.offset(0.75)):
        with BuildLine():
            Line((-47, -23.1548529118), (-47.9752313172, -22.9336654846))
            Line((-47.9752313172, -22.9336654846), (-48.6002014355, -25.6892038047))
            Line((-48.6002014355, -25.6892038047), (-31.8084545434, -28.2887462527))
            Line((-31.8084545434, -28.2887462527), (-11.6026224568, -29.4112917036))
            Line((-11.6026224568, -29.4112917036), (0, -29.9293901771))
            Line((0, -29.9293901771), (0, -26.1548529118))
            add(Edge.make_bspline(
                [(-47, -23.1548529118), (-39.471310208, -24.0545421828), (-29.2503257197, -25.7571688291), (-8.0323131497, -26.1634826516), (0, -26.1548529118)],
                knots=[0, 0, 0, 0, 0.4528935937, 1, 1, 1, 1], degree=3))
        make_face()
    extrude(amount=-F8_DEPTH)

    # F9 (on face) → F11 section 0
    with BuildSketch(Plane.YZ.offset(-8.8108518429)):
        Polygon((13.792830613, -0.5), (13.792830613, -1), (15.6468802348, -1.75), (15.6468802348, -1.25), align=None)
    # F10 (on face) → F11 section 1
    with BuildSketch(Plane(origin=(-14.8013141006, 0, 0), x_dir=(0, -1, 0), z_dir=(-1, 0, 0))):
        Polygon((-15.9850546559, -1.75), (-14.1310050341, -1), (-14.1310050341, -0.5), (-15.9850546559, -1.25), align=None)
    loft()

    # F12 (on face) → F14 section 0
    with BuildSketch(Plane(origin=(-15.4566018313, 0.3626887438, 0), x_dir=(-0.0234585156, -0.9997248112, 0), z_dir=(-0.9997248112, 0.0234585156, 0))):
        Polygon((24.1837628611, -0.5), (24.1837628611, -1), (26.0378124829, -1.75), (26.0378124829, -1.25), align=None)
    # F13 (on face) → F14 section 1
    with BuildSketch(Plane(origin=(-9.4582529644, 0.2219376499, 0), x_dir=(0.0234585156, 0.9997248112, 0), z_dir=(0.9997248112, -0.0234585156, 0))):
        Polygon((-26.0378124829, -1.75), (-24.1837628611, -1), (-24.1837628611, -0.5), (-26.0378124829, -1.25), align=None)
    loft()

    # F15 (on face) → F17 section 0
    with BuildSketch(Plane(origin=(1.1449940284, 5.04836124, 0), x_dir=(-0.9752313172, 0.2211874272, 0), z_dir=(0.2211874272, 0.9752313172, 0))):
        Polygon((38.4643095643, -0.5), (38.4643095643, -1), (40.3183591861, -1.75), (40.3183591861, -1.25), align=None)
    # F16 (on face) → F17 section 1
    with BuildSketch(Plane(origin=(-5.9330036433, -26.1590409101, 0), x_dir=(0.9752313172, -0.2211874272, 0), z_dir=(-0.2211874272, -0.9752313172, 0))):
        Polygon((-40.3183591861, -1.75), (-38.4643095643, -1), (-38.4643095643, -0.5), (-40.3183591861, -1.25), align=None)
    loft()

    # F18: F1 across plane


with BuildPart() as f1_1:
    add(f1.part)
    add(f1.part.mirror(Plane.YZ))


solid = f1_1.part
